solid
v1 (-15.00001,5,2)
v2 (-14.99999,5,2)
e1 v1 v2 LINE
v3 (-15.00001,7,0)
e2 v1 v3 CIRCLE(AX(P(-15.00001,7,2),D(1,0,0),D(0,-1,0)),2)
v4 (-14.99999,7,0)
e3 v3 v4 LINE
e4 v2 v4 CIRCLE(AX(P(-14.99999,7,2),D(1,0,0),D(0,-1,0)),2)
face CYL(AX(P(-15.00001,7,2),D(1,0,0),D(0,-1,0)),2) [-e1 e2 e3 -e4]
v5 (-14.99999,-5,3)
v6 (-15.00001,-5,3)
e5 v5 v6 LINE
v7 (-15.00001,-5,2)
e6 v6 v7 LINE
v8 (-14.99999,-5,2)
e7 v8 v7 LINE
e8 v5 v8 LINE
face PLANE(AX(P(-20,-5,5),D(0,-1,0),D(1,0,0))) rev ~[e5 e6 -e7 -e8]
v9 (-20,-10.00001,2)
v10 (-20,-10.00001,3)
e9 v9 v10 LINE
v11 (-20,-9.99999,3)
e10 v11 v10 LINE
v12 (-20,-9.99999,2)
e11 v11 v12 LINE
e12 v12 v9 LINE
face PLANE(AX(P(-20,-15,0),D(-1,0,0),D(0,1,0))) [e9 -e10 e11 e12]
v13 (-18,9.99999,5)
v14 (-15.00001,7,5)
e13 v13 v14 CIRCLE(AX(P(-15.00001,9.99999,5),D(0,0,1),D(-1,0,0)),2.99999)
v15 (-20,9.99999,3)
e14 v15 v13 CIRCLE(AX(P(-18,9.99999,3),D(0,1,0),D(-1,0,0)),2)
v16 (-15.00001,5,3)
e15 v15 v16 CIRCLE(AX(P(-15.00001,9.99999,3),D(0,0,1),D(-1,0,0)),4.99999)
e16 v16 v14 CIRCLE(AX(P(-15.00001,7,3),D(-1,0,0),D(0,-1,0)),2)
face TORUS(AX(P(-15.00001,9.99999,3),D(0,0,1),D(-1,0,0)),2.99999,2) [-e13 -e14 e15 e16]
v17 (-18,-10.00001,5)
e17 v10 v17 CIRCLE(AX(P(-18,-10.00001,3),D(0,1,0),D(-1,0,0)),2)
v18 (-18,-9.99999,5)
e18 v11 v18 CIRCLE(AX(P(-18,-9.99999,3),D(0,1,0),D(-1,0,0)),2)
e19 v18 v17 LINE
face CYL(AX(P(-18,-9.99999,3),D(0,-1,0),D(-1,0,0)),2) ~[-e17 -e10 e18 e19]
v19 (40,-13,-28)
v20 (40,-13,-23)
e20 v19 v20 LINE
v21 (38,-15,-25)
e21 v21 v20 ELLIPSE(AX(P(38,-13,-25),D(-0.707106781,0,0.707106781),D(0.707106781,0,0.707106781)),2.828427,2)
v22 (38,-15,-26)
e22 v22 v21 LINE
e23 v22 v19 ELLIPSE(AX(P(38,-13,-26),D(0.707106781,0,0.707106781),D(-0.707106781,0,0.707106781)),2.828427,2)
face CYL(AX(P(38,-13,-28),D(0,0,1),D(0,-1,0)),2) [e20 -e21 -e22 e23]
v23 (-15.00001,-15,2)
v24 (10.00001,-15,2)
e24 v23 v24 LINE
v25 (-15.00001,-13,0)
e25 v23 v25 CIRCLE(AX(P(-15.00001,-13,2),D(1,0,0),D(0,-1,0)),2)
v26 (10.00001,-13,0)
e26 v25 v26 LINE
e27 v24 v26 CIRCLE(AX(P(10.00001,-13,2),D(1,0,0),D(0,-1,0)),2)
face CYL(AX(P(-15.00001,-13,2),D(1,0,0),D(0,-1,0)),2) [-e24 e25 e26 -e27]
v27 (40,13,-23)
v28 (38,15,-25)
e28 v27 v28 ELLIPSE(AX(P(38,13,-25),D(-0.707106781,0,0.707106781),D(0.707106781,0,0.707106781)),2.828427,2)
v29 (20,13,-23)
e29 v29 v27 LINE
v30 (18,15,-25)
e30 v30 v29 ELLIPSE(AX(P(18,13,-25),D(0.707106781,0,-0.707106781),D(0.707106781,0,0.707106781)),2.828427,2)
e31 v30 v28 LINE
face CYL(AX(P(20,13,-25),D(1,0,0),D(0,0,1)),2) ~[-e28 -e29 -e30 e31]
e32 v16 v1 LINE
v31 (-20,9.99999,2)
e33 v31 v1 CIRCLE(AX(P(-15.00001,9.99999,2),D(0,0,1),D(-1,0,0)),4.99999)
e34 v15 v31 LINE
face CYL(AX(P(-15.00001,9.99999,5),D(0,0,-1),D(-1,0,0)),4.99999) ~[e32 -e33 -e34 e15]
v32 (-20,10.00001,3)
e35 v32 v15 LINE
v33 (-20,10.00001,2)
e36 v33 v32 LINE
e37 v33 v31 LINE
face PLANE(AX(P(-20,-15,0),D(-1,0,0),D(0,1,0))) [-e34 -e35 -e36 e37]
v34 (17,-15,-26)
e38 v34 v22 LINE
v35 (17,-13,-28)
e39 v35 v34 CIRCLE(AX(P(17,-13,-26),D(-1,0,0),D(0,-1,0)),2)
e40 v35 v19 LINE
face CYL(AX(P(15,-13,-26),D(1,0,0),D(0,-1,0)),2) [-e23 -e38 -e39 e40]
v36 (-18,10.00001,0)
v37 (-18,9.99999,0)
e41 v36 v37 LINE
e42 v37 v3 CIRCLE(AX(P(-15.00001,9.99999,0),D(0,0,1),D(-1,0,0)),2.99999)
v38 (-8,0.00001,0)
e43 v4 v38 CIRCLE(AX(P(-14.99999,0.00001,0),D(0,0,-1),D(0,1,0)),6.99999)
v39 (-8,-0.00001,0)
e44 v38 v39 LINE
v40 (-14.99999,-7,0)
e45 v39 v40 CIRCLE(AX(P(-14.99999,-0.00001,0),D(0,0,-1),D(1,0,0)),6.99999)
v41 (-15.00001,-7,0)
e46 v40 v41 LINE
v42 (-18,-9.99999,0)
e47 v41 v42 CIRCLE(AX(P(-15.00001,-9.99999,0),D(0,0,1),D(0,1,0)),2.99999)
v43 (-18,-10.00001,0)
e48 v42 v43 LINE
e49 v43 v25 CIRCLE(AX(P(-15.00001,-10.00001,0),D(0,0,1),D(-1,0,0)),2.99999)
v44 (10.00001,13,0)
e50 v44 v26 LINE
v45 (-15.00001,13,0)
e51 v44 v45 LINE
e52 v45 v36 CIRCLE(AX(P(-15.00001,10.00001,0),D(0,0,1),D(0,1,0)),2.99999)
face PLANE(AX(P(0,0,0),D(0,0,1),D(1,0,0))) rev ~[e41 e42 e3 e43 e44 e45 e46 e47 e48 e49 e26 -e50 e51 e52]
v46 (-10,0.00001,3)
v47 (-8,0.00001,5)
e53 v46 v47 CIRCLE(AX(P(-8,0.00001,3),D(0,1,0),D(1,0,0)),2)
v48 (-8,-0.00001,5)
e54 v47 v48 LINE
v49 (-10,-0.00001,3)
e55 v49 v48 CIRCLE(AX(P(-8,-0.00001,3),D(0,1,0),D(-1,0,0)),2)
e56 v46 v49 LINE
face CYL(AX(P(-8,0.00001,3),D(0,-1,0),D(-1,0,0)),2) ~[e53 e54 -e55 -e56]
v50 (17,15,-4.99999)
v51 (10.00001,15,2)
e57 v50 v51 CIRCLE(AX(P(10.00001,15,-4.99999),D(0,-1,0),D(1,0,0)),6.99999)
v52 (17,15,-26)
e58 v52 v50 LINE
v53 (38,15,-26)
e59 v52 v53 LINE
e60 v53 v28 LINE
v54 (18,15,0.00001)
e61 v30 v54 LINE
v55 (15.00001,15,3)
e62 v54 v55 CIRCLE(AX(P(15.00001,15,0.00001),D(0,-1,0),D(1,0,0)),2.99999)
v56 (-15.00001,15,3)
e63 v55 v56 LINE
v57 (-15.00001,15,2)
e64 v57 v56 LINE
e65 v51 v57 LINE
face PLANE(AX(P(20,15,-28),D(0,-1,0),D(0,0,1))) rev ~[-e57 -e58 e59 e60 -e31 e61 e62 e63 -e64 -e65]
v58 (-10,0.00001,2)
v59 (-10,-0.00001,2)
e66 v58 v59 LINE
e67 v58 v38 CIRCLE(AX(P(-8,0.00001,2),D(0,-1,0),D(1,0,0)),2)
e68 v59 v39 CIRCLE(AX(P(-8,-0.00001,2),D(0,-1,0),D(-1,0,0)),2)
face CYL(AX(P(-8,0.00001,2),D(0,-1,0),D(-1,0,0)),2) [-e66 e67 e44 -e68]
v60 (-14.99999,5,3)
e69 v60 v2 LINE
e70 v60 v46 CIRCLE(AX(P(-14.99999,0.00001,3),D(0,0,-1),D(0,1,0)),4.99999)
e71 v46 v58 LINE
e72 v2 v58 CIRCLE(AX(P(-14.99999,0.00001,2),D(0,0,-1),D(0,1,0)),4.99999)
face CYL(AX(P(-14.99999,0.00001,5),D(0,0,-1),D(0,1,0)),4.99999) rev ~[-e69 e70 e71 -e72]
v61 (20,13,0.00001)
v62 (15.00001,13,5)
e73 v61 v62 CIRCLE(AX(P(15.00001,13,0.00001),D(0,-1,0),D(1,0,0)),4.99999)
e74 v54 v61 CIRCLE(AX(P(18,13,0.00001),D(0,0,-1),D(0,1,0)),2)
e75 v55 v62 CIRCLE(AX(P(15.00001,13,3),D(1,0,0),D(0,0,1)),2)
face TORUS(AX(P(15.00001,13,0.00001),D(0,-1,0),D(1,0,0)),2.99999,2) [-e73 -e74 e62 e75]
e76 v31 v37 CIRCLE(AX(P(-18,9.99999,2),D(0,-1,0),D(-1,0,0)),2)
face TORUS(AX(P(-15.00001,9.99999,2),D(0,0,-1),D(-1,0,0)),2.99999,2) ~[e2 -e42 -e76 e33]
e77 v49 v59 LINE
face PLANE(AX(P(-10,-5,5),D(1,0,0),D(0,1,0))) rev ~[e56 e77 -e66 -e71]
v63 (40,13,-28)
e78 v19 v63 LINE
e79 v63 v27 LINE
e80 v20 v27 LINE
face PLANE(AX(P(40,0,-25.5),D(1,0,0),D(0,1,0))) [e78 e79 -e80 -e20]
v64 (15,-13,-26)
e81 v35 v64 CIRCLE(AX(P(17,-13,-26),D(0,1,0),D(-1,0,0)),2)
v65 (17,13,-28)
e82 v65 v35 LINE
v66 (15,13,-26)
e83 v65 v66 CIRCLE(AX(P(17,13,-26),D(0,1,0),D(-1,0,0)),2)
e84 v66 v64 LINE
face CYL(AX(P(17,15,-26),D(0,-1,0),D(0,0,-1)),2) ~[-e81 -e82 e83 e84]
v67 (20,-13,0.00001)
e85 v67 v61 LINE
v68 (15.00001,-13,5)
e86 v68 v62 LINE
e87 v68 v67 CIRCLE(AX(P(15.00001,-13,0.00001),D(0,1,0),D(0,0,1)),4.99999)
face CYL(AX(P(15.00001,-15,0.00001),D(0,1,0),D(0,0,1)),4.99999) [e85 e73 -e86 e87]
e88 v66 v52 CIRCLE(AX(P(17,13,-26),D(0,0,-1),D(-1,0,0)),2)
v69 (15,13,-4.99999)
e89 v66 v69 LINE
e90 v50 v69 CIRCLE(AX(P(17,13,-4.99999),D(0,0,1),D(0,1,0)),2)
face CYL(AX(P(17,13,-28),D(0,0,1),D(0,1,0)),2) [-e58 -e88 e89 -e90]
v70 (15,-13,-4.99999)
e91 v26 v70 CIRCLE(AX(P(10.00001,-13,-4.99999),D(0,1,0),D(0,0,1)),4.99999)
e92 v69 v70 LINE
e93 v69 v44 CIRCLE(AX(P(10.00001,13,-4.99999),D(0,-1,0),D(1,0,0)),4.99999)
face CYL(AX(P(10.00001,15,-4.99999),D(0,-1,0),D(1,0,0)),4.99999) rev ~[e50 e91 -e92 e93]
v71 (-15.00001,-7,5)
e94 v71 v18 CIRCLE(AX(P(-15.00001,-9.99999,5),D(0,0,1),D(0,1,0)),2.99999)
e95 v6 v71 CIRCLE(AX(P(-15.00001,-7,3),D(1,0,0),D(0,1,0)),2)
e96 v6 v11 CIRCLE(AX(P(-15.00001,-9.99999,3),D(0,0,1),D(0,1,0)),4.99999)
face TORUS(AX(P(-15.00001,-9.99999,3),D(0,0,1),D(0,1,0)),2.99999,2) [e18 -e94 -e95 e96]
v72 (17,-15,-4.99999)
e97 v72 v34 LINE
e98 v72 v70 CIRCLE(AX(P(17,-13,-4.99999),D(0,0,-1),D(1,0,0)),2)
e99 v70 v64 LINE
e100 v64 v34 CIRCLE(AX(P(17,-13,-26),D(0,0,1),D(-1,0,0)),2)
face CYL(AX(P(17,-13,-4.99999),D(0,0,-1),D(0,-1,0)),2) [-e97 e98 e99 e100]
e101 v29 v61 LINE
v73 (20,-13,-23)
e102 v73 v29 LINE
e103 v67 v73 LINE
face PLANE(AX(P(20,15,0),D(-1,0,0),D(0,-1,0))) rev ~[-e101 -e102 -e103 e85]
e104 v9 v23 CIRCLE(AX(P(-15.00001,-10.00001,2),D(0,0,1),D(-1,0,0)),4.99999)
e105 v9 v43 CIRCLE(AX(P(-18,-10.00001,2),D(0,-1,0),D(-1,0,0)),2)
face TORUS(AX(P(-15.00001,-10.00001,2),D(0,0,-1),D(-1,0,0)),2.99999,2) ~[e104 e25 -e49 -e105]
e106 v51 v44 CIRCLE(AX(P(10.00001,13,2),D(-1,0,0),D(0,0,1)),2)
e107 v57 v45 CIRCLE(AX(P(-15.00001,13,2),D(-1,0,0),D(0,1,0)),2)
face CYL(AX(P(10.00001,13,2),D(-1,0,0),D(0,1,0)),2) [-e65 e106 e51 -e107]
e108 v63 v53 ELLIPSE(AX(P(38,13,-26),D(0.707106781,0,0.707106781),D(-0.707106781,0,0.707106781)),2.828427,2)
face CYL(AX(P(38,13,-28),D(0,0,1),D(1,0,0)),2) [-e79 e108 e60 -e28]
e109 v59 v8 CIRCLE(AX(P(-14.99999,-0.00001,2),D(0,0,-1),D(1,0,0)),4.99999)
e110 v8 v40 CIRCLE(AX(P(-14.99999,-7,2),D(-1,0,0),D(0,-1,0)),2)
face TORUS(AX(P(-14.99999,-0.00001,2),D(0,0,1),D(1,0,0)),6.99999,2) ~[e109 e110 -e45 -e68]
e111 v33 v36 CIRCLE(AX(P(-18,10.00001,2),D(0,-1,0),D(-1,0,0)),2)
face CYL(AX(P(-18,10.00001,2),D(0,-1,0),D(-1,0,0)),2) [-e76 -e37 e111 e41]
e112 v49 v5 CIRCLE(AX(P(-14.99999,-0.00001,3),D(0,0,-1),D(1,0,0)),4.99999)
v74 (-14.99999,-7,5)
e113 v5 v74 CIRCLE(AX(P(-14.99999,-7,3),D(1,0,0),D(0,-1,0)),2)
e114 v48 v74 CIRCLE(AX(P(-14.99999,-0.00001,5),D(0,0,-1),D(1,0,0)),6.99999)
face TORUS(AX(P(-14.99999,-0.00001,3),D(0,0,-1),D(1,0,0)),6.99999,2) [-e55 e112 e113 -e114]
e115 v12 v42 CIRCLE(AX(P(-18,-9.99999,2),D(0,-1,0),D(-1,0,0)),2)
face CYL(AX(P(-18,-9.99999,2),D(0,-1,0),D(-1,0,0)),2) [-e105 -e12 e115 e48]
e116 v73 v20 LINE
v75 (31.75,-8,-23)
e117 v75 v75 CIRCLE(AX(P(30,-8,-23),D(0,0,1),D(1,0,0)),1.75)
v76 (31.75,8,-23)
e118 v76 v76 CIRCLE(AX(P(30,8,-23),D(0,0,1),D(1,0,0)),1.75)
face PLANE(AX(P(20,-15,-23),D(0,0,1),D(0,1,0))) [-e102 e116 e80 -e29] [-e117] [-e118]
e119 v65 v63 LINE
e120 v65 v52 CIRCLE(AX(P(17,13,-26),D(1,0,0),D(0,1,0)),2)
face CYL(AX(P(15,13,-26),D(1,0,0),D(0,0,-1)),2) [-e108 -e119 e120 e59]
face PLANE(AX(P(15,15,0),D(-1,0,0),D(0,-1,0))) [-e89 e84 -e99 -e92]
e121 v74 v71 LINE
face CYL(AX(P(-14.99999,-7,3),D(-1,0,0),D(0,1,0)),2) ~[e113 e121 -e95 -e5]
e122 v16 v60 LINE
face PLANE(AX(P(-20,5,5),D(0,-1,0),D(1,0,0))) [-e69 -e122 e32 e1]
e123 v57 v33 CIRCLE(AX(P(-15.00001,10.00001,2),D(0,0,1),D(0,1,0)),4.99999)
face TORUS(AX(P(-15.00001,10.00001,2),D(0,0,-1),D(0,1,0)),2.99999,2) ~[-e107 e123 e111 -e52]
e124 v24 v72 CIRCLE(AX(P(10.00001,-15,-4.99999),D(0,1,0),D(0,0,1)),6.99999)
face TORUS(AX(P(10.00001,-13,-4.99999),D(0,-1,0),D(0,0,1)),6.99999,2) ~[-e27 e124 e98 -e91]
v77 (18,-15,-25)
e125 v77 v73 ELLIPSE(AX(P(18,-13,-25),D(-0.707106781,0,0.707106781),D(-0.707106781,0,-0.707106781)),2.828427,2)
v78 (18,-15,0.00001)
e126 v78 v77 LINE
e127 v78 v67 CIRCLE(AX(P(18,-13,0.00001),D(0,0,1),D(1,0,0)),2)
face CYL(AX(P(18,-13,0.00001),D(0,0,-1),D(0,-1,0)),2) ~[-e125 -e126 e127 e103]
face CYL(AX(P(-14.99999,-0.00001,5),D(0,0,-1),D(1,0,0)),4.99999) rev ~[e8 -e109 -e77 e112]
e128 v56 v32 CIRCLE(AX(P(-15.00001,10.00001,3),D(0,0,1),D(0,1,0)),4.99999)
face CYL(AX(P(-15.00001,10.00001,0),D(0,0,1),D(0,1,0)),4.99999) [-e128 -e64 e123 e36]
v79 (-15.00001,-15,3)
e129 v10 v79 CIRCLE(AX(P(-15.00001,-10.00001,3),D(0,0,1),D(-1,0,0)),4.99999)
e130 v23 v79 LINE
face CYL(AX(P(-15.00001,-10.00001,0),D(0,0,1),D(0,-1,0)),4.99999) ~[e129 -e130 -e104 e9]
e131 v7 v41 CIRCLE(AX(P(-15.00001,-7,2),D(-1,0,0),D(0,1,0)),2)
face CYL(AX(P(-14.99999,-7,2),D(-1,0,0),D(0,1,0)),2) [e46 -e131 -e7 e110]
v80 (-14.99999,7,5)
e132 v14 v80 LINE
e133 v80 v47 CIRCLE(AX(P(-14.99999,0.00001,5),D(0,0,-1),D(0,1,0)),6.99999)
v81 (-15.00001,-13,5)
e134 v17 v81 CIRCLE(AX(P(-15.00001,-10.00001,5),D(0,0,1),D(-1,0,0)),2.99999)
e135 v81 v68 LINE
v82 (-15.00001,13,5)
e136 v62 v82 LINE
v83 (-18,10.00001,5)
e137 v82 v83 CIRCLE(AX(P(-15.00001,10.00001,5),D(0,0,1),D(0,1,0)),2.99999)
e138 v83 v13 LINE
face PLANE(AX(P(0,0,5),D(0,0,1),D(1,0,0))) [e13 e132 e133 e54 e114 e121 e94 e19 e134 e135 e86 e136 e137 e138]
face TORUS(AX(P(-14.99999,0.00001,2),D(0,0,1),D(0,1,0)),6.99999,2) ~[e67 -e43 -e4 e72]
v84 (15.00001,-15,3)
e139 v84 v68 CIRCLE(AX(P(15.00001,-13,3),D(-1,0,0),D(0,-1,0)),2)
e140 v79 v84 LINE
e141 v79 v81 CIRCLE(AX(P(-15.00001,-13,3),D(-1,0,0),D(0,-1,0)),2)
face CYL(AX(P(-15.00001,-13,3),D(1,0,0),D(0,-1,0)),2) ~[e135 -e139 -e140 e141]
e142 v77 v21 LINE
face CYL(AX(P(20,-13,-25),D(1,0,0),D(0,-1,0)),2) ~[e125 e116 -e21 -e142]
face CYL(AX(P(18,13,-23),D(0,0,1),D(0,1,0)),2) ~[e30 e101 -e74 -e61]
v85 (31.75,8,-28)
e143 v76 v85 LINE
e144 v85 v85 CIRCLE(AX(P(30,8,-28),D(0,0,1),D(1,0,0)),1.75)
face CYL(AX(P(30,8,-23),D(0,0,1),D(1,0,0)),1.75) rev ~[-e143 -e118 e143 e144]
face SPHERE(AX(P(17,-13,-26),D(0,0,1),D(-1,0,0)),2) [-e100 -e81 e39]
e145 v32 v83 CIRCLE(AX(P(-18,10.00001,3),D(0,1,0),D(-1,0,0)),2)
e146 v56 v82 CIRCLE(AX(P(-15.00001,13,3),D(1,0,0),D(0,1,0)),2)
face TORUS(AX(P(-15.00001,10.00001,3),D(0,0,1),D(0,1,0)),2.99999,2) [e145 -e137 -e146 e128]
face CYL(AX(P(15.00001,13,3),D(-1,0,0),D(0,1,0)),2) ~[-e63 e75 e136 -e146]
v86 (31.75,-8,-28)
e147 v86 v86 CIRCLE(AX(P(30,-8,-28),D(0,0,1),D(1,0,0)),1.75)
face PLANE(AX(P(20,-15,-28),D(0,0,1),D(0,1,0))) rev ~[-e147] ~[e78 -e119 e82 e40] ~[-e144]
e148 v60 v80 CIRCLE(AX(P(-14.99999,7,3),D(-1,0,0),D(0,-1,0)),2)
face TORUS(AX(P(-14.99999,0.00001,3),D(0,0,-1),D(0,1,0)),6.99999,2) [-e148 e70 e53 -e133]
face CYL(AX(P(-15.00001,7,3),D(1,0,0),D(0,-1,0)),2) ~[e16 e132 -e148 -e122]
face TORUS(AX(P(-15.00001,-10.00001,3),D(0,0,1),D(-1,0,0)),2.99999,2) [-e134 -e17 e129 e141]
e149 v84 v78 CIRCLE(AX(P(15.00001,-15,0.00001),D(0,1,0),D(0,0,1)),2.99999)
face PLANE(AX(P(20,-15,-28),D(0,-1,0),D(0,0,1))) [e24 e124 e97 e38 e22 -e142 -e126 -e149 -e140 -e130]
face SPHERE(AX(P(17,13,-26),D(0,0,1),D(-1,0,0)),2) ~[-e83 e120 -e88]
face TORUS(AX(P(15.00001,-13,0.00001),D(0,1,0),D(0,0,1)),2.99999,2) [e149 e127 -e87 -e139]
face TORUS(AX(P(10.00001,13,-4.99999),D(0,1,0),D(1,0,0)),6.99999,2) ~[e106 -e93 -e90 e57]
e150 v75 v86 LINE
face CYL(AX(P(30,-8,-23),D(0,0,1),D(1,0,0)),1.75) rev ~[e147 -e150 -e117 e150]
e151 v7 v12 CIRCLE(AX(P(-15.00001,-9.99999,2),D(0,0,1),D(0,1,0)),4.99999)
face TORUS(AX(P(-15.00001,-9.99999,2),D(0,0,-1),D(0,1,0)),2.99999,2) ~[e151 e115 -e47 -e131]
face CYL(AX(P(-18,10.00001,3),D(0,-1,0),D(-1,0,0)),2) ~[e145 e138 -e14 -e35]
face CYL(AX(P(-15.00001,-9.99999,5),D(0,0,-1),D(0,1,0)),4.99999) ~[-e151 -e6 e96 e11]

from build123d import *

# Parameters (mm, degrees)
F0_W      = 40
F0_H      = 30
F1_DEPTH  = 5
F2_W      = 10
F2_H      = 10
F3_DEPTH  = 25
F4_W      = 5
F4_H      = 30
F5_DEPTH  = 28
F6_W      = 30
F6_H      = 5
F7_DEPTH  = 20
F8_R      = 4.99999
F9_R      = 2
F10_R     = 1.75
F11_DEPTH = 25


# Not quite as in the source:
# - a fillet or chamfer is up to 0.001 mm smaller than in the source, because OpenCascade refuses the exact size


with BuildPart() as f1:
    # F0 (on Top) → F1 (new body)
    with BuildSketch(Plane.XY):
        Rectangle(F0_W, F0_H)
    extrude(amount=F1_DEPTH)

    # F2 (on face) → F3 (cut)
    with BuildSketch(Plane.XY.offset(5)):
        with Locations((-15, 0)):
            Rectangle(F2_W, F2_H)
    extrude(amount=-F3_DEPTH, mode=Mode.SUBTRACT)

    # F4 (on face) → F5 (join)
    with BuildSketch(Plane(origin=(0, 0, 0), x_dir=(1, 0, 0), z_dir=(0, 0, -1))):
        with Locations((17.5, 0)):
            Rectangle(F4_W, F4_H)
    extrude(amount=F5_DEPTH)

    # F6 (on face) → F7 (join)
    with BuildSketch(Plane.YZ.offset(20)):
        with Locations((0, -25.5)):
            Rectangle(F6_W, F6_H)
    extrude(amount=F7_DEPTH)

    # F8 (radius 5 in the source; OpenCascade refuses exactly that, so slightly less here)
    f8_edges = [f1.edges().sort_by_distance(p)[0] for p in [
        (-20, 5, 2.5),
        (-20, -5, 2.5),
        (-20, -15, 2.5),
        (-20, 15, 2.5),
        (20, 0, 5),
        (-10, -5, 2.5),
        (-10, 5, 2.5),
        (15, 0, 0),
    ]]
    fillet(f8_edges, radius=F8_R)

    # F9
    f9_edges = [f1.edges().sort_by_distance(p)[0] for p in [
        (0, -15, 5),
        (-18.535537, -13.535537, 5),
        (15.00001, 0, 5),
        (-20, -10, 5),
        (0, 15, 5),
        (-18.535537, -6.464463, 5),
        (-18.535537, 13.535537, 5),
        (-15, -5, 5),
        (-20, 10, 5),
        (-11.464463, -3.535537, 5),
        (-18.535537, 6.464463, 5),
        (-10, 0, 5),
        (-15, 5, 5),
        (-11.464463, 3.535537, 5),
        (15, -15, -16.499995),
        (15, 0, -28),
        (-15.00001, -15, 2.5),
        (18.535537, -15, 3.535537),
        (-2.5, -15, 0),
        (20, -15, -11.499995),
        (13.535537, -15, -1.464463),
        (30, -15, -23),
        (40, -15, -25.5),
        (27.5, -15, -28),
        (20, 15, -11.499995),
        (18.535537, 15, 3.535537),
        (30, 15, -23),
        (40, 15, -25.5),
        (-15.00001, 15, 2.5),
        (27.5, 15, -28),
        (-2.5, 15, 0),
        (15, 15, -16.499995),
        (13.535537, 15, -1.464463),
    ]]
    fillet(f9_edges, radius=F9_R)

    # F10 (on face) → F11 (cut)
    with BuildSketch(Plane.XY.offset(-23)):
        with Locations((30, -8)):
            Circle(F10_R)
        with Locations((30, 8)):
            Circle(F10_R)
    extrude(amount=-F11_DEPTH, mode=Mode.SUBTRACT)


solid = f1.part
